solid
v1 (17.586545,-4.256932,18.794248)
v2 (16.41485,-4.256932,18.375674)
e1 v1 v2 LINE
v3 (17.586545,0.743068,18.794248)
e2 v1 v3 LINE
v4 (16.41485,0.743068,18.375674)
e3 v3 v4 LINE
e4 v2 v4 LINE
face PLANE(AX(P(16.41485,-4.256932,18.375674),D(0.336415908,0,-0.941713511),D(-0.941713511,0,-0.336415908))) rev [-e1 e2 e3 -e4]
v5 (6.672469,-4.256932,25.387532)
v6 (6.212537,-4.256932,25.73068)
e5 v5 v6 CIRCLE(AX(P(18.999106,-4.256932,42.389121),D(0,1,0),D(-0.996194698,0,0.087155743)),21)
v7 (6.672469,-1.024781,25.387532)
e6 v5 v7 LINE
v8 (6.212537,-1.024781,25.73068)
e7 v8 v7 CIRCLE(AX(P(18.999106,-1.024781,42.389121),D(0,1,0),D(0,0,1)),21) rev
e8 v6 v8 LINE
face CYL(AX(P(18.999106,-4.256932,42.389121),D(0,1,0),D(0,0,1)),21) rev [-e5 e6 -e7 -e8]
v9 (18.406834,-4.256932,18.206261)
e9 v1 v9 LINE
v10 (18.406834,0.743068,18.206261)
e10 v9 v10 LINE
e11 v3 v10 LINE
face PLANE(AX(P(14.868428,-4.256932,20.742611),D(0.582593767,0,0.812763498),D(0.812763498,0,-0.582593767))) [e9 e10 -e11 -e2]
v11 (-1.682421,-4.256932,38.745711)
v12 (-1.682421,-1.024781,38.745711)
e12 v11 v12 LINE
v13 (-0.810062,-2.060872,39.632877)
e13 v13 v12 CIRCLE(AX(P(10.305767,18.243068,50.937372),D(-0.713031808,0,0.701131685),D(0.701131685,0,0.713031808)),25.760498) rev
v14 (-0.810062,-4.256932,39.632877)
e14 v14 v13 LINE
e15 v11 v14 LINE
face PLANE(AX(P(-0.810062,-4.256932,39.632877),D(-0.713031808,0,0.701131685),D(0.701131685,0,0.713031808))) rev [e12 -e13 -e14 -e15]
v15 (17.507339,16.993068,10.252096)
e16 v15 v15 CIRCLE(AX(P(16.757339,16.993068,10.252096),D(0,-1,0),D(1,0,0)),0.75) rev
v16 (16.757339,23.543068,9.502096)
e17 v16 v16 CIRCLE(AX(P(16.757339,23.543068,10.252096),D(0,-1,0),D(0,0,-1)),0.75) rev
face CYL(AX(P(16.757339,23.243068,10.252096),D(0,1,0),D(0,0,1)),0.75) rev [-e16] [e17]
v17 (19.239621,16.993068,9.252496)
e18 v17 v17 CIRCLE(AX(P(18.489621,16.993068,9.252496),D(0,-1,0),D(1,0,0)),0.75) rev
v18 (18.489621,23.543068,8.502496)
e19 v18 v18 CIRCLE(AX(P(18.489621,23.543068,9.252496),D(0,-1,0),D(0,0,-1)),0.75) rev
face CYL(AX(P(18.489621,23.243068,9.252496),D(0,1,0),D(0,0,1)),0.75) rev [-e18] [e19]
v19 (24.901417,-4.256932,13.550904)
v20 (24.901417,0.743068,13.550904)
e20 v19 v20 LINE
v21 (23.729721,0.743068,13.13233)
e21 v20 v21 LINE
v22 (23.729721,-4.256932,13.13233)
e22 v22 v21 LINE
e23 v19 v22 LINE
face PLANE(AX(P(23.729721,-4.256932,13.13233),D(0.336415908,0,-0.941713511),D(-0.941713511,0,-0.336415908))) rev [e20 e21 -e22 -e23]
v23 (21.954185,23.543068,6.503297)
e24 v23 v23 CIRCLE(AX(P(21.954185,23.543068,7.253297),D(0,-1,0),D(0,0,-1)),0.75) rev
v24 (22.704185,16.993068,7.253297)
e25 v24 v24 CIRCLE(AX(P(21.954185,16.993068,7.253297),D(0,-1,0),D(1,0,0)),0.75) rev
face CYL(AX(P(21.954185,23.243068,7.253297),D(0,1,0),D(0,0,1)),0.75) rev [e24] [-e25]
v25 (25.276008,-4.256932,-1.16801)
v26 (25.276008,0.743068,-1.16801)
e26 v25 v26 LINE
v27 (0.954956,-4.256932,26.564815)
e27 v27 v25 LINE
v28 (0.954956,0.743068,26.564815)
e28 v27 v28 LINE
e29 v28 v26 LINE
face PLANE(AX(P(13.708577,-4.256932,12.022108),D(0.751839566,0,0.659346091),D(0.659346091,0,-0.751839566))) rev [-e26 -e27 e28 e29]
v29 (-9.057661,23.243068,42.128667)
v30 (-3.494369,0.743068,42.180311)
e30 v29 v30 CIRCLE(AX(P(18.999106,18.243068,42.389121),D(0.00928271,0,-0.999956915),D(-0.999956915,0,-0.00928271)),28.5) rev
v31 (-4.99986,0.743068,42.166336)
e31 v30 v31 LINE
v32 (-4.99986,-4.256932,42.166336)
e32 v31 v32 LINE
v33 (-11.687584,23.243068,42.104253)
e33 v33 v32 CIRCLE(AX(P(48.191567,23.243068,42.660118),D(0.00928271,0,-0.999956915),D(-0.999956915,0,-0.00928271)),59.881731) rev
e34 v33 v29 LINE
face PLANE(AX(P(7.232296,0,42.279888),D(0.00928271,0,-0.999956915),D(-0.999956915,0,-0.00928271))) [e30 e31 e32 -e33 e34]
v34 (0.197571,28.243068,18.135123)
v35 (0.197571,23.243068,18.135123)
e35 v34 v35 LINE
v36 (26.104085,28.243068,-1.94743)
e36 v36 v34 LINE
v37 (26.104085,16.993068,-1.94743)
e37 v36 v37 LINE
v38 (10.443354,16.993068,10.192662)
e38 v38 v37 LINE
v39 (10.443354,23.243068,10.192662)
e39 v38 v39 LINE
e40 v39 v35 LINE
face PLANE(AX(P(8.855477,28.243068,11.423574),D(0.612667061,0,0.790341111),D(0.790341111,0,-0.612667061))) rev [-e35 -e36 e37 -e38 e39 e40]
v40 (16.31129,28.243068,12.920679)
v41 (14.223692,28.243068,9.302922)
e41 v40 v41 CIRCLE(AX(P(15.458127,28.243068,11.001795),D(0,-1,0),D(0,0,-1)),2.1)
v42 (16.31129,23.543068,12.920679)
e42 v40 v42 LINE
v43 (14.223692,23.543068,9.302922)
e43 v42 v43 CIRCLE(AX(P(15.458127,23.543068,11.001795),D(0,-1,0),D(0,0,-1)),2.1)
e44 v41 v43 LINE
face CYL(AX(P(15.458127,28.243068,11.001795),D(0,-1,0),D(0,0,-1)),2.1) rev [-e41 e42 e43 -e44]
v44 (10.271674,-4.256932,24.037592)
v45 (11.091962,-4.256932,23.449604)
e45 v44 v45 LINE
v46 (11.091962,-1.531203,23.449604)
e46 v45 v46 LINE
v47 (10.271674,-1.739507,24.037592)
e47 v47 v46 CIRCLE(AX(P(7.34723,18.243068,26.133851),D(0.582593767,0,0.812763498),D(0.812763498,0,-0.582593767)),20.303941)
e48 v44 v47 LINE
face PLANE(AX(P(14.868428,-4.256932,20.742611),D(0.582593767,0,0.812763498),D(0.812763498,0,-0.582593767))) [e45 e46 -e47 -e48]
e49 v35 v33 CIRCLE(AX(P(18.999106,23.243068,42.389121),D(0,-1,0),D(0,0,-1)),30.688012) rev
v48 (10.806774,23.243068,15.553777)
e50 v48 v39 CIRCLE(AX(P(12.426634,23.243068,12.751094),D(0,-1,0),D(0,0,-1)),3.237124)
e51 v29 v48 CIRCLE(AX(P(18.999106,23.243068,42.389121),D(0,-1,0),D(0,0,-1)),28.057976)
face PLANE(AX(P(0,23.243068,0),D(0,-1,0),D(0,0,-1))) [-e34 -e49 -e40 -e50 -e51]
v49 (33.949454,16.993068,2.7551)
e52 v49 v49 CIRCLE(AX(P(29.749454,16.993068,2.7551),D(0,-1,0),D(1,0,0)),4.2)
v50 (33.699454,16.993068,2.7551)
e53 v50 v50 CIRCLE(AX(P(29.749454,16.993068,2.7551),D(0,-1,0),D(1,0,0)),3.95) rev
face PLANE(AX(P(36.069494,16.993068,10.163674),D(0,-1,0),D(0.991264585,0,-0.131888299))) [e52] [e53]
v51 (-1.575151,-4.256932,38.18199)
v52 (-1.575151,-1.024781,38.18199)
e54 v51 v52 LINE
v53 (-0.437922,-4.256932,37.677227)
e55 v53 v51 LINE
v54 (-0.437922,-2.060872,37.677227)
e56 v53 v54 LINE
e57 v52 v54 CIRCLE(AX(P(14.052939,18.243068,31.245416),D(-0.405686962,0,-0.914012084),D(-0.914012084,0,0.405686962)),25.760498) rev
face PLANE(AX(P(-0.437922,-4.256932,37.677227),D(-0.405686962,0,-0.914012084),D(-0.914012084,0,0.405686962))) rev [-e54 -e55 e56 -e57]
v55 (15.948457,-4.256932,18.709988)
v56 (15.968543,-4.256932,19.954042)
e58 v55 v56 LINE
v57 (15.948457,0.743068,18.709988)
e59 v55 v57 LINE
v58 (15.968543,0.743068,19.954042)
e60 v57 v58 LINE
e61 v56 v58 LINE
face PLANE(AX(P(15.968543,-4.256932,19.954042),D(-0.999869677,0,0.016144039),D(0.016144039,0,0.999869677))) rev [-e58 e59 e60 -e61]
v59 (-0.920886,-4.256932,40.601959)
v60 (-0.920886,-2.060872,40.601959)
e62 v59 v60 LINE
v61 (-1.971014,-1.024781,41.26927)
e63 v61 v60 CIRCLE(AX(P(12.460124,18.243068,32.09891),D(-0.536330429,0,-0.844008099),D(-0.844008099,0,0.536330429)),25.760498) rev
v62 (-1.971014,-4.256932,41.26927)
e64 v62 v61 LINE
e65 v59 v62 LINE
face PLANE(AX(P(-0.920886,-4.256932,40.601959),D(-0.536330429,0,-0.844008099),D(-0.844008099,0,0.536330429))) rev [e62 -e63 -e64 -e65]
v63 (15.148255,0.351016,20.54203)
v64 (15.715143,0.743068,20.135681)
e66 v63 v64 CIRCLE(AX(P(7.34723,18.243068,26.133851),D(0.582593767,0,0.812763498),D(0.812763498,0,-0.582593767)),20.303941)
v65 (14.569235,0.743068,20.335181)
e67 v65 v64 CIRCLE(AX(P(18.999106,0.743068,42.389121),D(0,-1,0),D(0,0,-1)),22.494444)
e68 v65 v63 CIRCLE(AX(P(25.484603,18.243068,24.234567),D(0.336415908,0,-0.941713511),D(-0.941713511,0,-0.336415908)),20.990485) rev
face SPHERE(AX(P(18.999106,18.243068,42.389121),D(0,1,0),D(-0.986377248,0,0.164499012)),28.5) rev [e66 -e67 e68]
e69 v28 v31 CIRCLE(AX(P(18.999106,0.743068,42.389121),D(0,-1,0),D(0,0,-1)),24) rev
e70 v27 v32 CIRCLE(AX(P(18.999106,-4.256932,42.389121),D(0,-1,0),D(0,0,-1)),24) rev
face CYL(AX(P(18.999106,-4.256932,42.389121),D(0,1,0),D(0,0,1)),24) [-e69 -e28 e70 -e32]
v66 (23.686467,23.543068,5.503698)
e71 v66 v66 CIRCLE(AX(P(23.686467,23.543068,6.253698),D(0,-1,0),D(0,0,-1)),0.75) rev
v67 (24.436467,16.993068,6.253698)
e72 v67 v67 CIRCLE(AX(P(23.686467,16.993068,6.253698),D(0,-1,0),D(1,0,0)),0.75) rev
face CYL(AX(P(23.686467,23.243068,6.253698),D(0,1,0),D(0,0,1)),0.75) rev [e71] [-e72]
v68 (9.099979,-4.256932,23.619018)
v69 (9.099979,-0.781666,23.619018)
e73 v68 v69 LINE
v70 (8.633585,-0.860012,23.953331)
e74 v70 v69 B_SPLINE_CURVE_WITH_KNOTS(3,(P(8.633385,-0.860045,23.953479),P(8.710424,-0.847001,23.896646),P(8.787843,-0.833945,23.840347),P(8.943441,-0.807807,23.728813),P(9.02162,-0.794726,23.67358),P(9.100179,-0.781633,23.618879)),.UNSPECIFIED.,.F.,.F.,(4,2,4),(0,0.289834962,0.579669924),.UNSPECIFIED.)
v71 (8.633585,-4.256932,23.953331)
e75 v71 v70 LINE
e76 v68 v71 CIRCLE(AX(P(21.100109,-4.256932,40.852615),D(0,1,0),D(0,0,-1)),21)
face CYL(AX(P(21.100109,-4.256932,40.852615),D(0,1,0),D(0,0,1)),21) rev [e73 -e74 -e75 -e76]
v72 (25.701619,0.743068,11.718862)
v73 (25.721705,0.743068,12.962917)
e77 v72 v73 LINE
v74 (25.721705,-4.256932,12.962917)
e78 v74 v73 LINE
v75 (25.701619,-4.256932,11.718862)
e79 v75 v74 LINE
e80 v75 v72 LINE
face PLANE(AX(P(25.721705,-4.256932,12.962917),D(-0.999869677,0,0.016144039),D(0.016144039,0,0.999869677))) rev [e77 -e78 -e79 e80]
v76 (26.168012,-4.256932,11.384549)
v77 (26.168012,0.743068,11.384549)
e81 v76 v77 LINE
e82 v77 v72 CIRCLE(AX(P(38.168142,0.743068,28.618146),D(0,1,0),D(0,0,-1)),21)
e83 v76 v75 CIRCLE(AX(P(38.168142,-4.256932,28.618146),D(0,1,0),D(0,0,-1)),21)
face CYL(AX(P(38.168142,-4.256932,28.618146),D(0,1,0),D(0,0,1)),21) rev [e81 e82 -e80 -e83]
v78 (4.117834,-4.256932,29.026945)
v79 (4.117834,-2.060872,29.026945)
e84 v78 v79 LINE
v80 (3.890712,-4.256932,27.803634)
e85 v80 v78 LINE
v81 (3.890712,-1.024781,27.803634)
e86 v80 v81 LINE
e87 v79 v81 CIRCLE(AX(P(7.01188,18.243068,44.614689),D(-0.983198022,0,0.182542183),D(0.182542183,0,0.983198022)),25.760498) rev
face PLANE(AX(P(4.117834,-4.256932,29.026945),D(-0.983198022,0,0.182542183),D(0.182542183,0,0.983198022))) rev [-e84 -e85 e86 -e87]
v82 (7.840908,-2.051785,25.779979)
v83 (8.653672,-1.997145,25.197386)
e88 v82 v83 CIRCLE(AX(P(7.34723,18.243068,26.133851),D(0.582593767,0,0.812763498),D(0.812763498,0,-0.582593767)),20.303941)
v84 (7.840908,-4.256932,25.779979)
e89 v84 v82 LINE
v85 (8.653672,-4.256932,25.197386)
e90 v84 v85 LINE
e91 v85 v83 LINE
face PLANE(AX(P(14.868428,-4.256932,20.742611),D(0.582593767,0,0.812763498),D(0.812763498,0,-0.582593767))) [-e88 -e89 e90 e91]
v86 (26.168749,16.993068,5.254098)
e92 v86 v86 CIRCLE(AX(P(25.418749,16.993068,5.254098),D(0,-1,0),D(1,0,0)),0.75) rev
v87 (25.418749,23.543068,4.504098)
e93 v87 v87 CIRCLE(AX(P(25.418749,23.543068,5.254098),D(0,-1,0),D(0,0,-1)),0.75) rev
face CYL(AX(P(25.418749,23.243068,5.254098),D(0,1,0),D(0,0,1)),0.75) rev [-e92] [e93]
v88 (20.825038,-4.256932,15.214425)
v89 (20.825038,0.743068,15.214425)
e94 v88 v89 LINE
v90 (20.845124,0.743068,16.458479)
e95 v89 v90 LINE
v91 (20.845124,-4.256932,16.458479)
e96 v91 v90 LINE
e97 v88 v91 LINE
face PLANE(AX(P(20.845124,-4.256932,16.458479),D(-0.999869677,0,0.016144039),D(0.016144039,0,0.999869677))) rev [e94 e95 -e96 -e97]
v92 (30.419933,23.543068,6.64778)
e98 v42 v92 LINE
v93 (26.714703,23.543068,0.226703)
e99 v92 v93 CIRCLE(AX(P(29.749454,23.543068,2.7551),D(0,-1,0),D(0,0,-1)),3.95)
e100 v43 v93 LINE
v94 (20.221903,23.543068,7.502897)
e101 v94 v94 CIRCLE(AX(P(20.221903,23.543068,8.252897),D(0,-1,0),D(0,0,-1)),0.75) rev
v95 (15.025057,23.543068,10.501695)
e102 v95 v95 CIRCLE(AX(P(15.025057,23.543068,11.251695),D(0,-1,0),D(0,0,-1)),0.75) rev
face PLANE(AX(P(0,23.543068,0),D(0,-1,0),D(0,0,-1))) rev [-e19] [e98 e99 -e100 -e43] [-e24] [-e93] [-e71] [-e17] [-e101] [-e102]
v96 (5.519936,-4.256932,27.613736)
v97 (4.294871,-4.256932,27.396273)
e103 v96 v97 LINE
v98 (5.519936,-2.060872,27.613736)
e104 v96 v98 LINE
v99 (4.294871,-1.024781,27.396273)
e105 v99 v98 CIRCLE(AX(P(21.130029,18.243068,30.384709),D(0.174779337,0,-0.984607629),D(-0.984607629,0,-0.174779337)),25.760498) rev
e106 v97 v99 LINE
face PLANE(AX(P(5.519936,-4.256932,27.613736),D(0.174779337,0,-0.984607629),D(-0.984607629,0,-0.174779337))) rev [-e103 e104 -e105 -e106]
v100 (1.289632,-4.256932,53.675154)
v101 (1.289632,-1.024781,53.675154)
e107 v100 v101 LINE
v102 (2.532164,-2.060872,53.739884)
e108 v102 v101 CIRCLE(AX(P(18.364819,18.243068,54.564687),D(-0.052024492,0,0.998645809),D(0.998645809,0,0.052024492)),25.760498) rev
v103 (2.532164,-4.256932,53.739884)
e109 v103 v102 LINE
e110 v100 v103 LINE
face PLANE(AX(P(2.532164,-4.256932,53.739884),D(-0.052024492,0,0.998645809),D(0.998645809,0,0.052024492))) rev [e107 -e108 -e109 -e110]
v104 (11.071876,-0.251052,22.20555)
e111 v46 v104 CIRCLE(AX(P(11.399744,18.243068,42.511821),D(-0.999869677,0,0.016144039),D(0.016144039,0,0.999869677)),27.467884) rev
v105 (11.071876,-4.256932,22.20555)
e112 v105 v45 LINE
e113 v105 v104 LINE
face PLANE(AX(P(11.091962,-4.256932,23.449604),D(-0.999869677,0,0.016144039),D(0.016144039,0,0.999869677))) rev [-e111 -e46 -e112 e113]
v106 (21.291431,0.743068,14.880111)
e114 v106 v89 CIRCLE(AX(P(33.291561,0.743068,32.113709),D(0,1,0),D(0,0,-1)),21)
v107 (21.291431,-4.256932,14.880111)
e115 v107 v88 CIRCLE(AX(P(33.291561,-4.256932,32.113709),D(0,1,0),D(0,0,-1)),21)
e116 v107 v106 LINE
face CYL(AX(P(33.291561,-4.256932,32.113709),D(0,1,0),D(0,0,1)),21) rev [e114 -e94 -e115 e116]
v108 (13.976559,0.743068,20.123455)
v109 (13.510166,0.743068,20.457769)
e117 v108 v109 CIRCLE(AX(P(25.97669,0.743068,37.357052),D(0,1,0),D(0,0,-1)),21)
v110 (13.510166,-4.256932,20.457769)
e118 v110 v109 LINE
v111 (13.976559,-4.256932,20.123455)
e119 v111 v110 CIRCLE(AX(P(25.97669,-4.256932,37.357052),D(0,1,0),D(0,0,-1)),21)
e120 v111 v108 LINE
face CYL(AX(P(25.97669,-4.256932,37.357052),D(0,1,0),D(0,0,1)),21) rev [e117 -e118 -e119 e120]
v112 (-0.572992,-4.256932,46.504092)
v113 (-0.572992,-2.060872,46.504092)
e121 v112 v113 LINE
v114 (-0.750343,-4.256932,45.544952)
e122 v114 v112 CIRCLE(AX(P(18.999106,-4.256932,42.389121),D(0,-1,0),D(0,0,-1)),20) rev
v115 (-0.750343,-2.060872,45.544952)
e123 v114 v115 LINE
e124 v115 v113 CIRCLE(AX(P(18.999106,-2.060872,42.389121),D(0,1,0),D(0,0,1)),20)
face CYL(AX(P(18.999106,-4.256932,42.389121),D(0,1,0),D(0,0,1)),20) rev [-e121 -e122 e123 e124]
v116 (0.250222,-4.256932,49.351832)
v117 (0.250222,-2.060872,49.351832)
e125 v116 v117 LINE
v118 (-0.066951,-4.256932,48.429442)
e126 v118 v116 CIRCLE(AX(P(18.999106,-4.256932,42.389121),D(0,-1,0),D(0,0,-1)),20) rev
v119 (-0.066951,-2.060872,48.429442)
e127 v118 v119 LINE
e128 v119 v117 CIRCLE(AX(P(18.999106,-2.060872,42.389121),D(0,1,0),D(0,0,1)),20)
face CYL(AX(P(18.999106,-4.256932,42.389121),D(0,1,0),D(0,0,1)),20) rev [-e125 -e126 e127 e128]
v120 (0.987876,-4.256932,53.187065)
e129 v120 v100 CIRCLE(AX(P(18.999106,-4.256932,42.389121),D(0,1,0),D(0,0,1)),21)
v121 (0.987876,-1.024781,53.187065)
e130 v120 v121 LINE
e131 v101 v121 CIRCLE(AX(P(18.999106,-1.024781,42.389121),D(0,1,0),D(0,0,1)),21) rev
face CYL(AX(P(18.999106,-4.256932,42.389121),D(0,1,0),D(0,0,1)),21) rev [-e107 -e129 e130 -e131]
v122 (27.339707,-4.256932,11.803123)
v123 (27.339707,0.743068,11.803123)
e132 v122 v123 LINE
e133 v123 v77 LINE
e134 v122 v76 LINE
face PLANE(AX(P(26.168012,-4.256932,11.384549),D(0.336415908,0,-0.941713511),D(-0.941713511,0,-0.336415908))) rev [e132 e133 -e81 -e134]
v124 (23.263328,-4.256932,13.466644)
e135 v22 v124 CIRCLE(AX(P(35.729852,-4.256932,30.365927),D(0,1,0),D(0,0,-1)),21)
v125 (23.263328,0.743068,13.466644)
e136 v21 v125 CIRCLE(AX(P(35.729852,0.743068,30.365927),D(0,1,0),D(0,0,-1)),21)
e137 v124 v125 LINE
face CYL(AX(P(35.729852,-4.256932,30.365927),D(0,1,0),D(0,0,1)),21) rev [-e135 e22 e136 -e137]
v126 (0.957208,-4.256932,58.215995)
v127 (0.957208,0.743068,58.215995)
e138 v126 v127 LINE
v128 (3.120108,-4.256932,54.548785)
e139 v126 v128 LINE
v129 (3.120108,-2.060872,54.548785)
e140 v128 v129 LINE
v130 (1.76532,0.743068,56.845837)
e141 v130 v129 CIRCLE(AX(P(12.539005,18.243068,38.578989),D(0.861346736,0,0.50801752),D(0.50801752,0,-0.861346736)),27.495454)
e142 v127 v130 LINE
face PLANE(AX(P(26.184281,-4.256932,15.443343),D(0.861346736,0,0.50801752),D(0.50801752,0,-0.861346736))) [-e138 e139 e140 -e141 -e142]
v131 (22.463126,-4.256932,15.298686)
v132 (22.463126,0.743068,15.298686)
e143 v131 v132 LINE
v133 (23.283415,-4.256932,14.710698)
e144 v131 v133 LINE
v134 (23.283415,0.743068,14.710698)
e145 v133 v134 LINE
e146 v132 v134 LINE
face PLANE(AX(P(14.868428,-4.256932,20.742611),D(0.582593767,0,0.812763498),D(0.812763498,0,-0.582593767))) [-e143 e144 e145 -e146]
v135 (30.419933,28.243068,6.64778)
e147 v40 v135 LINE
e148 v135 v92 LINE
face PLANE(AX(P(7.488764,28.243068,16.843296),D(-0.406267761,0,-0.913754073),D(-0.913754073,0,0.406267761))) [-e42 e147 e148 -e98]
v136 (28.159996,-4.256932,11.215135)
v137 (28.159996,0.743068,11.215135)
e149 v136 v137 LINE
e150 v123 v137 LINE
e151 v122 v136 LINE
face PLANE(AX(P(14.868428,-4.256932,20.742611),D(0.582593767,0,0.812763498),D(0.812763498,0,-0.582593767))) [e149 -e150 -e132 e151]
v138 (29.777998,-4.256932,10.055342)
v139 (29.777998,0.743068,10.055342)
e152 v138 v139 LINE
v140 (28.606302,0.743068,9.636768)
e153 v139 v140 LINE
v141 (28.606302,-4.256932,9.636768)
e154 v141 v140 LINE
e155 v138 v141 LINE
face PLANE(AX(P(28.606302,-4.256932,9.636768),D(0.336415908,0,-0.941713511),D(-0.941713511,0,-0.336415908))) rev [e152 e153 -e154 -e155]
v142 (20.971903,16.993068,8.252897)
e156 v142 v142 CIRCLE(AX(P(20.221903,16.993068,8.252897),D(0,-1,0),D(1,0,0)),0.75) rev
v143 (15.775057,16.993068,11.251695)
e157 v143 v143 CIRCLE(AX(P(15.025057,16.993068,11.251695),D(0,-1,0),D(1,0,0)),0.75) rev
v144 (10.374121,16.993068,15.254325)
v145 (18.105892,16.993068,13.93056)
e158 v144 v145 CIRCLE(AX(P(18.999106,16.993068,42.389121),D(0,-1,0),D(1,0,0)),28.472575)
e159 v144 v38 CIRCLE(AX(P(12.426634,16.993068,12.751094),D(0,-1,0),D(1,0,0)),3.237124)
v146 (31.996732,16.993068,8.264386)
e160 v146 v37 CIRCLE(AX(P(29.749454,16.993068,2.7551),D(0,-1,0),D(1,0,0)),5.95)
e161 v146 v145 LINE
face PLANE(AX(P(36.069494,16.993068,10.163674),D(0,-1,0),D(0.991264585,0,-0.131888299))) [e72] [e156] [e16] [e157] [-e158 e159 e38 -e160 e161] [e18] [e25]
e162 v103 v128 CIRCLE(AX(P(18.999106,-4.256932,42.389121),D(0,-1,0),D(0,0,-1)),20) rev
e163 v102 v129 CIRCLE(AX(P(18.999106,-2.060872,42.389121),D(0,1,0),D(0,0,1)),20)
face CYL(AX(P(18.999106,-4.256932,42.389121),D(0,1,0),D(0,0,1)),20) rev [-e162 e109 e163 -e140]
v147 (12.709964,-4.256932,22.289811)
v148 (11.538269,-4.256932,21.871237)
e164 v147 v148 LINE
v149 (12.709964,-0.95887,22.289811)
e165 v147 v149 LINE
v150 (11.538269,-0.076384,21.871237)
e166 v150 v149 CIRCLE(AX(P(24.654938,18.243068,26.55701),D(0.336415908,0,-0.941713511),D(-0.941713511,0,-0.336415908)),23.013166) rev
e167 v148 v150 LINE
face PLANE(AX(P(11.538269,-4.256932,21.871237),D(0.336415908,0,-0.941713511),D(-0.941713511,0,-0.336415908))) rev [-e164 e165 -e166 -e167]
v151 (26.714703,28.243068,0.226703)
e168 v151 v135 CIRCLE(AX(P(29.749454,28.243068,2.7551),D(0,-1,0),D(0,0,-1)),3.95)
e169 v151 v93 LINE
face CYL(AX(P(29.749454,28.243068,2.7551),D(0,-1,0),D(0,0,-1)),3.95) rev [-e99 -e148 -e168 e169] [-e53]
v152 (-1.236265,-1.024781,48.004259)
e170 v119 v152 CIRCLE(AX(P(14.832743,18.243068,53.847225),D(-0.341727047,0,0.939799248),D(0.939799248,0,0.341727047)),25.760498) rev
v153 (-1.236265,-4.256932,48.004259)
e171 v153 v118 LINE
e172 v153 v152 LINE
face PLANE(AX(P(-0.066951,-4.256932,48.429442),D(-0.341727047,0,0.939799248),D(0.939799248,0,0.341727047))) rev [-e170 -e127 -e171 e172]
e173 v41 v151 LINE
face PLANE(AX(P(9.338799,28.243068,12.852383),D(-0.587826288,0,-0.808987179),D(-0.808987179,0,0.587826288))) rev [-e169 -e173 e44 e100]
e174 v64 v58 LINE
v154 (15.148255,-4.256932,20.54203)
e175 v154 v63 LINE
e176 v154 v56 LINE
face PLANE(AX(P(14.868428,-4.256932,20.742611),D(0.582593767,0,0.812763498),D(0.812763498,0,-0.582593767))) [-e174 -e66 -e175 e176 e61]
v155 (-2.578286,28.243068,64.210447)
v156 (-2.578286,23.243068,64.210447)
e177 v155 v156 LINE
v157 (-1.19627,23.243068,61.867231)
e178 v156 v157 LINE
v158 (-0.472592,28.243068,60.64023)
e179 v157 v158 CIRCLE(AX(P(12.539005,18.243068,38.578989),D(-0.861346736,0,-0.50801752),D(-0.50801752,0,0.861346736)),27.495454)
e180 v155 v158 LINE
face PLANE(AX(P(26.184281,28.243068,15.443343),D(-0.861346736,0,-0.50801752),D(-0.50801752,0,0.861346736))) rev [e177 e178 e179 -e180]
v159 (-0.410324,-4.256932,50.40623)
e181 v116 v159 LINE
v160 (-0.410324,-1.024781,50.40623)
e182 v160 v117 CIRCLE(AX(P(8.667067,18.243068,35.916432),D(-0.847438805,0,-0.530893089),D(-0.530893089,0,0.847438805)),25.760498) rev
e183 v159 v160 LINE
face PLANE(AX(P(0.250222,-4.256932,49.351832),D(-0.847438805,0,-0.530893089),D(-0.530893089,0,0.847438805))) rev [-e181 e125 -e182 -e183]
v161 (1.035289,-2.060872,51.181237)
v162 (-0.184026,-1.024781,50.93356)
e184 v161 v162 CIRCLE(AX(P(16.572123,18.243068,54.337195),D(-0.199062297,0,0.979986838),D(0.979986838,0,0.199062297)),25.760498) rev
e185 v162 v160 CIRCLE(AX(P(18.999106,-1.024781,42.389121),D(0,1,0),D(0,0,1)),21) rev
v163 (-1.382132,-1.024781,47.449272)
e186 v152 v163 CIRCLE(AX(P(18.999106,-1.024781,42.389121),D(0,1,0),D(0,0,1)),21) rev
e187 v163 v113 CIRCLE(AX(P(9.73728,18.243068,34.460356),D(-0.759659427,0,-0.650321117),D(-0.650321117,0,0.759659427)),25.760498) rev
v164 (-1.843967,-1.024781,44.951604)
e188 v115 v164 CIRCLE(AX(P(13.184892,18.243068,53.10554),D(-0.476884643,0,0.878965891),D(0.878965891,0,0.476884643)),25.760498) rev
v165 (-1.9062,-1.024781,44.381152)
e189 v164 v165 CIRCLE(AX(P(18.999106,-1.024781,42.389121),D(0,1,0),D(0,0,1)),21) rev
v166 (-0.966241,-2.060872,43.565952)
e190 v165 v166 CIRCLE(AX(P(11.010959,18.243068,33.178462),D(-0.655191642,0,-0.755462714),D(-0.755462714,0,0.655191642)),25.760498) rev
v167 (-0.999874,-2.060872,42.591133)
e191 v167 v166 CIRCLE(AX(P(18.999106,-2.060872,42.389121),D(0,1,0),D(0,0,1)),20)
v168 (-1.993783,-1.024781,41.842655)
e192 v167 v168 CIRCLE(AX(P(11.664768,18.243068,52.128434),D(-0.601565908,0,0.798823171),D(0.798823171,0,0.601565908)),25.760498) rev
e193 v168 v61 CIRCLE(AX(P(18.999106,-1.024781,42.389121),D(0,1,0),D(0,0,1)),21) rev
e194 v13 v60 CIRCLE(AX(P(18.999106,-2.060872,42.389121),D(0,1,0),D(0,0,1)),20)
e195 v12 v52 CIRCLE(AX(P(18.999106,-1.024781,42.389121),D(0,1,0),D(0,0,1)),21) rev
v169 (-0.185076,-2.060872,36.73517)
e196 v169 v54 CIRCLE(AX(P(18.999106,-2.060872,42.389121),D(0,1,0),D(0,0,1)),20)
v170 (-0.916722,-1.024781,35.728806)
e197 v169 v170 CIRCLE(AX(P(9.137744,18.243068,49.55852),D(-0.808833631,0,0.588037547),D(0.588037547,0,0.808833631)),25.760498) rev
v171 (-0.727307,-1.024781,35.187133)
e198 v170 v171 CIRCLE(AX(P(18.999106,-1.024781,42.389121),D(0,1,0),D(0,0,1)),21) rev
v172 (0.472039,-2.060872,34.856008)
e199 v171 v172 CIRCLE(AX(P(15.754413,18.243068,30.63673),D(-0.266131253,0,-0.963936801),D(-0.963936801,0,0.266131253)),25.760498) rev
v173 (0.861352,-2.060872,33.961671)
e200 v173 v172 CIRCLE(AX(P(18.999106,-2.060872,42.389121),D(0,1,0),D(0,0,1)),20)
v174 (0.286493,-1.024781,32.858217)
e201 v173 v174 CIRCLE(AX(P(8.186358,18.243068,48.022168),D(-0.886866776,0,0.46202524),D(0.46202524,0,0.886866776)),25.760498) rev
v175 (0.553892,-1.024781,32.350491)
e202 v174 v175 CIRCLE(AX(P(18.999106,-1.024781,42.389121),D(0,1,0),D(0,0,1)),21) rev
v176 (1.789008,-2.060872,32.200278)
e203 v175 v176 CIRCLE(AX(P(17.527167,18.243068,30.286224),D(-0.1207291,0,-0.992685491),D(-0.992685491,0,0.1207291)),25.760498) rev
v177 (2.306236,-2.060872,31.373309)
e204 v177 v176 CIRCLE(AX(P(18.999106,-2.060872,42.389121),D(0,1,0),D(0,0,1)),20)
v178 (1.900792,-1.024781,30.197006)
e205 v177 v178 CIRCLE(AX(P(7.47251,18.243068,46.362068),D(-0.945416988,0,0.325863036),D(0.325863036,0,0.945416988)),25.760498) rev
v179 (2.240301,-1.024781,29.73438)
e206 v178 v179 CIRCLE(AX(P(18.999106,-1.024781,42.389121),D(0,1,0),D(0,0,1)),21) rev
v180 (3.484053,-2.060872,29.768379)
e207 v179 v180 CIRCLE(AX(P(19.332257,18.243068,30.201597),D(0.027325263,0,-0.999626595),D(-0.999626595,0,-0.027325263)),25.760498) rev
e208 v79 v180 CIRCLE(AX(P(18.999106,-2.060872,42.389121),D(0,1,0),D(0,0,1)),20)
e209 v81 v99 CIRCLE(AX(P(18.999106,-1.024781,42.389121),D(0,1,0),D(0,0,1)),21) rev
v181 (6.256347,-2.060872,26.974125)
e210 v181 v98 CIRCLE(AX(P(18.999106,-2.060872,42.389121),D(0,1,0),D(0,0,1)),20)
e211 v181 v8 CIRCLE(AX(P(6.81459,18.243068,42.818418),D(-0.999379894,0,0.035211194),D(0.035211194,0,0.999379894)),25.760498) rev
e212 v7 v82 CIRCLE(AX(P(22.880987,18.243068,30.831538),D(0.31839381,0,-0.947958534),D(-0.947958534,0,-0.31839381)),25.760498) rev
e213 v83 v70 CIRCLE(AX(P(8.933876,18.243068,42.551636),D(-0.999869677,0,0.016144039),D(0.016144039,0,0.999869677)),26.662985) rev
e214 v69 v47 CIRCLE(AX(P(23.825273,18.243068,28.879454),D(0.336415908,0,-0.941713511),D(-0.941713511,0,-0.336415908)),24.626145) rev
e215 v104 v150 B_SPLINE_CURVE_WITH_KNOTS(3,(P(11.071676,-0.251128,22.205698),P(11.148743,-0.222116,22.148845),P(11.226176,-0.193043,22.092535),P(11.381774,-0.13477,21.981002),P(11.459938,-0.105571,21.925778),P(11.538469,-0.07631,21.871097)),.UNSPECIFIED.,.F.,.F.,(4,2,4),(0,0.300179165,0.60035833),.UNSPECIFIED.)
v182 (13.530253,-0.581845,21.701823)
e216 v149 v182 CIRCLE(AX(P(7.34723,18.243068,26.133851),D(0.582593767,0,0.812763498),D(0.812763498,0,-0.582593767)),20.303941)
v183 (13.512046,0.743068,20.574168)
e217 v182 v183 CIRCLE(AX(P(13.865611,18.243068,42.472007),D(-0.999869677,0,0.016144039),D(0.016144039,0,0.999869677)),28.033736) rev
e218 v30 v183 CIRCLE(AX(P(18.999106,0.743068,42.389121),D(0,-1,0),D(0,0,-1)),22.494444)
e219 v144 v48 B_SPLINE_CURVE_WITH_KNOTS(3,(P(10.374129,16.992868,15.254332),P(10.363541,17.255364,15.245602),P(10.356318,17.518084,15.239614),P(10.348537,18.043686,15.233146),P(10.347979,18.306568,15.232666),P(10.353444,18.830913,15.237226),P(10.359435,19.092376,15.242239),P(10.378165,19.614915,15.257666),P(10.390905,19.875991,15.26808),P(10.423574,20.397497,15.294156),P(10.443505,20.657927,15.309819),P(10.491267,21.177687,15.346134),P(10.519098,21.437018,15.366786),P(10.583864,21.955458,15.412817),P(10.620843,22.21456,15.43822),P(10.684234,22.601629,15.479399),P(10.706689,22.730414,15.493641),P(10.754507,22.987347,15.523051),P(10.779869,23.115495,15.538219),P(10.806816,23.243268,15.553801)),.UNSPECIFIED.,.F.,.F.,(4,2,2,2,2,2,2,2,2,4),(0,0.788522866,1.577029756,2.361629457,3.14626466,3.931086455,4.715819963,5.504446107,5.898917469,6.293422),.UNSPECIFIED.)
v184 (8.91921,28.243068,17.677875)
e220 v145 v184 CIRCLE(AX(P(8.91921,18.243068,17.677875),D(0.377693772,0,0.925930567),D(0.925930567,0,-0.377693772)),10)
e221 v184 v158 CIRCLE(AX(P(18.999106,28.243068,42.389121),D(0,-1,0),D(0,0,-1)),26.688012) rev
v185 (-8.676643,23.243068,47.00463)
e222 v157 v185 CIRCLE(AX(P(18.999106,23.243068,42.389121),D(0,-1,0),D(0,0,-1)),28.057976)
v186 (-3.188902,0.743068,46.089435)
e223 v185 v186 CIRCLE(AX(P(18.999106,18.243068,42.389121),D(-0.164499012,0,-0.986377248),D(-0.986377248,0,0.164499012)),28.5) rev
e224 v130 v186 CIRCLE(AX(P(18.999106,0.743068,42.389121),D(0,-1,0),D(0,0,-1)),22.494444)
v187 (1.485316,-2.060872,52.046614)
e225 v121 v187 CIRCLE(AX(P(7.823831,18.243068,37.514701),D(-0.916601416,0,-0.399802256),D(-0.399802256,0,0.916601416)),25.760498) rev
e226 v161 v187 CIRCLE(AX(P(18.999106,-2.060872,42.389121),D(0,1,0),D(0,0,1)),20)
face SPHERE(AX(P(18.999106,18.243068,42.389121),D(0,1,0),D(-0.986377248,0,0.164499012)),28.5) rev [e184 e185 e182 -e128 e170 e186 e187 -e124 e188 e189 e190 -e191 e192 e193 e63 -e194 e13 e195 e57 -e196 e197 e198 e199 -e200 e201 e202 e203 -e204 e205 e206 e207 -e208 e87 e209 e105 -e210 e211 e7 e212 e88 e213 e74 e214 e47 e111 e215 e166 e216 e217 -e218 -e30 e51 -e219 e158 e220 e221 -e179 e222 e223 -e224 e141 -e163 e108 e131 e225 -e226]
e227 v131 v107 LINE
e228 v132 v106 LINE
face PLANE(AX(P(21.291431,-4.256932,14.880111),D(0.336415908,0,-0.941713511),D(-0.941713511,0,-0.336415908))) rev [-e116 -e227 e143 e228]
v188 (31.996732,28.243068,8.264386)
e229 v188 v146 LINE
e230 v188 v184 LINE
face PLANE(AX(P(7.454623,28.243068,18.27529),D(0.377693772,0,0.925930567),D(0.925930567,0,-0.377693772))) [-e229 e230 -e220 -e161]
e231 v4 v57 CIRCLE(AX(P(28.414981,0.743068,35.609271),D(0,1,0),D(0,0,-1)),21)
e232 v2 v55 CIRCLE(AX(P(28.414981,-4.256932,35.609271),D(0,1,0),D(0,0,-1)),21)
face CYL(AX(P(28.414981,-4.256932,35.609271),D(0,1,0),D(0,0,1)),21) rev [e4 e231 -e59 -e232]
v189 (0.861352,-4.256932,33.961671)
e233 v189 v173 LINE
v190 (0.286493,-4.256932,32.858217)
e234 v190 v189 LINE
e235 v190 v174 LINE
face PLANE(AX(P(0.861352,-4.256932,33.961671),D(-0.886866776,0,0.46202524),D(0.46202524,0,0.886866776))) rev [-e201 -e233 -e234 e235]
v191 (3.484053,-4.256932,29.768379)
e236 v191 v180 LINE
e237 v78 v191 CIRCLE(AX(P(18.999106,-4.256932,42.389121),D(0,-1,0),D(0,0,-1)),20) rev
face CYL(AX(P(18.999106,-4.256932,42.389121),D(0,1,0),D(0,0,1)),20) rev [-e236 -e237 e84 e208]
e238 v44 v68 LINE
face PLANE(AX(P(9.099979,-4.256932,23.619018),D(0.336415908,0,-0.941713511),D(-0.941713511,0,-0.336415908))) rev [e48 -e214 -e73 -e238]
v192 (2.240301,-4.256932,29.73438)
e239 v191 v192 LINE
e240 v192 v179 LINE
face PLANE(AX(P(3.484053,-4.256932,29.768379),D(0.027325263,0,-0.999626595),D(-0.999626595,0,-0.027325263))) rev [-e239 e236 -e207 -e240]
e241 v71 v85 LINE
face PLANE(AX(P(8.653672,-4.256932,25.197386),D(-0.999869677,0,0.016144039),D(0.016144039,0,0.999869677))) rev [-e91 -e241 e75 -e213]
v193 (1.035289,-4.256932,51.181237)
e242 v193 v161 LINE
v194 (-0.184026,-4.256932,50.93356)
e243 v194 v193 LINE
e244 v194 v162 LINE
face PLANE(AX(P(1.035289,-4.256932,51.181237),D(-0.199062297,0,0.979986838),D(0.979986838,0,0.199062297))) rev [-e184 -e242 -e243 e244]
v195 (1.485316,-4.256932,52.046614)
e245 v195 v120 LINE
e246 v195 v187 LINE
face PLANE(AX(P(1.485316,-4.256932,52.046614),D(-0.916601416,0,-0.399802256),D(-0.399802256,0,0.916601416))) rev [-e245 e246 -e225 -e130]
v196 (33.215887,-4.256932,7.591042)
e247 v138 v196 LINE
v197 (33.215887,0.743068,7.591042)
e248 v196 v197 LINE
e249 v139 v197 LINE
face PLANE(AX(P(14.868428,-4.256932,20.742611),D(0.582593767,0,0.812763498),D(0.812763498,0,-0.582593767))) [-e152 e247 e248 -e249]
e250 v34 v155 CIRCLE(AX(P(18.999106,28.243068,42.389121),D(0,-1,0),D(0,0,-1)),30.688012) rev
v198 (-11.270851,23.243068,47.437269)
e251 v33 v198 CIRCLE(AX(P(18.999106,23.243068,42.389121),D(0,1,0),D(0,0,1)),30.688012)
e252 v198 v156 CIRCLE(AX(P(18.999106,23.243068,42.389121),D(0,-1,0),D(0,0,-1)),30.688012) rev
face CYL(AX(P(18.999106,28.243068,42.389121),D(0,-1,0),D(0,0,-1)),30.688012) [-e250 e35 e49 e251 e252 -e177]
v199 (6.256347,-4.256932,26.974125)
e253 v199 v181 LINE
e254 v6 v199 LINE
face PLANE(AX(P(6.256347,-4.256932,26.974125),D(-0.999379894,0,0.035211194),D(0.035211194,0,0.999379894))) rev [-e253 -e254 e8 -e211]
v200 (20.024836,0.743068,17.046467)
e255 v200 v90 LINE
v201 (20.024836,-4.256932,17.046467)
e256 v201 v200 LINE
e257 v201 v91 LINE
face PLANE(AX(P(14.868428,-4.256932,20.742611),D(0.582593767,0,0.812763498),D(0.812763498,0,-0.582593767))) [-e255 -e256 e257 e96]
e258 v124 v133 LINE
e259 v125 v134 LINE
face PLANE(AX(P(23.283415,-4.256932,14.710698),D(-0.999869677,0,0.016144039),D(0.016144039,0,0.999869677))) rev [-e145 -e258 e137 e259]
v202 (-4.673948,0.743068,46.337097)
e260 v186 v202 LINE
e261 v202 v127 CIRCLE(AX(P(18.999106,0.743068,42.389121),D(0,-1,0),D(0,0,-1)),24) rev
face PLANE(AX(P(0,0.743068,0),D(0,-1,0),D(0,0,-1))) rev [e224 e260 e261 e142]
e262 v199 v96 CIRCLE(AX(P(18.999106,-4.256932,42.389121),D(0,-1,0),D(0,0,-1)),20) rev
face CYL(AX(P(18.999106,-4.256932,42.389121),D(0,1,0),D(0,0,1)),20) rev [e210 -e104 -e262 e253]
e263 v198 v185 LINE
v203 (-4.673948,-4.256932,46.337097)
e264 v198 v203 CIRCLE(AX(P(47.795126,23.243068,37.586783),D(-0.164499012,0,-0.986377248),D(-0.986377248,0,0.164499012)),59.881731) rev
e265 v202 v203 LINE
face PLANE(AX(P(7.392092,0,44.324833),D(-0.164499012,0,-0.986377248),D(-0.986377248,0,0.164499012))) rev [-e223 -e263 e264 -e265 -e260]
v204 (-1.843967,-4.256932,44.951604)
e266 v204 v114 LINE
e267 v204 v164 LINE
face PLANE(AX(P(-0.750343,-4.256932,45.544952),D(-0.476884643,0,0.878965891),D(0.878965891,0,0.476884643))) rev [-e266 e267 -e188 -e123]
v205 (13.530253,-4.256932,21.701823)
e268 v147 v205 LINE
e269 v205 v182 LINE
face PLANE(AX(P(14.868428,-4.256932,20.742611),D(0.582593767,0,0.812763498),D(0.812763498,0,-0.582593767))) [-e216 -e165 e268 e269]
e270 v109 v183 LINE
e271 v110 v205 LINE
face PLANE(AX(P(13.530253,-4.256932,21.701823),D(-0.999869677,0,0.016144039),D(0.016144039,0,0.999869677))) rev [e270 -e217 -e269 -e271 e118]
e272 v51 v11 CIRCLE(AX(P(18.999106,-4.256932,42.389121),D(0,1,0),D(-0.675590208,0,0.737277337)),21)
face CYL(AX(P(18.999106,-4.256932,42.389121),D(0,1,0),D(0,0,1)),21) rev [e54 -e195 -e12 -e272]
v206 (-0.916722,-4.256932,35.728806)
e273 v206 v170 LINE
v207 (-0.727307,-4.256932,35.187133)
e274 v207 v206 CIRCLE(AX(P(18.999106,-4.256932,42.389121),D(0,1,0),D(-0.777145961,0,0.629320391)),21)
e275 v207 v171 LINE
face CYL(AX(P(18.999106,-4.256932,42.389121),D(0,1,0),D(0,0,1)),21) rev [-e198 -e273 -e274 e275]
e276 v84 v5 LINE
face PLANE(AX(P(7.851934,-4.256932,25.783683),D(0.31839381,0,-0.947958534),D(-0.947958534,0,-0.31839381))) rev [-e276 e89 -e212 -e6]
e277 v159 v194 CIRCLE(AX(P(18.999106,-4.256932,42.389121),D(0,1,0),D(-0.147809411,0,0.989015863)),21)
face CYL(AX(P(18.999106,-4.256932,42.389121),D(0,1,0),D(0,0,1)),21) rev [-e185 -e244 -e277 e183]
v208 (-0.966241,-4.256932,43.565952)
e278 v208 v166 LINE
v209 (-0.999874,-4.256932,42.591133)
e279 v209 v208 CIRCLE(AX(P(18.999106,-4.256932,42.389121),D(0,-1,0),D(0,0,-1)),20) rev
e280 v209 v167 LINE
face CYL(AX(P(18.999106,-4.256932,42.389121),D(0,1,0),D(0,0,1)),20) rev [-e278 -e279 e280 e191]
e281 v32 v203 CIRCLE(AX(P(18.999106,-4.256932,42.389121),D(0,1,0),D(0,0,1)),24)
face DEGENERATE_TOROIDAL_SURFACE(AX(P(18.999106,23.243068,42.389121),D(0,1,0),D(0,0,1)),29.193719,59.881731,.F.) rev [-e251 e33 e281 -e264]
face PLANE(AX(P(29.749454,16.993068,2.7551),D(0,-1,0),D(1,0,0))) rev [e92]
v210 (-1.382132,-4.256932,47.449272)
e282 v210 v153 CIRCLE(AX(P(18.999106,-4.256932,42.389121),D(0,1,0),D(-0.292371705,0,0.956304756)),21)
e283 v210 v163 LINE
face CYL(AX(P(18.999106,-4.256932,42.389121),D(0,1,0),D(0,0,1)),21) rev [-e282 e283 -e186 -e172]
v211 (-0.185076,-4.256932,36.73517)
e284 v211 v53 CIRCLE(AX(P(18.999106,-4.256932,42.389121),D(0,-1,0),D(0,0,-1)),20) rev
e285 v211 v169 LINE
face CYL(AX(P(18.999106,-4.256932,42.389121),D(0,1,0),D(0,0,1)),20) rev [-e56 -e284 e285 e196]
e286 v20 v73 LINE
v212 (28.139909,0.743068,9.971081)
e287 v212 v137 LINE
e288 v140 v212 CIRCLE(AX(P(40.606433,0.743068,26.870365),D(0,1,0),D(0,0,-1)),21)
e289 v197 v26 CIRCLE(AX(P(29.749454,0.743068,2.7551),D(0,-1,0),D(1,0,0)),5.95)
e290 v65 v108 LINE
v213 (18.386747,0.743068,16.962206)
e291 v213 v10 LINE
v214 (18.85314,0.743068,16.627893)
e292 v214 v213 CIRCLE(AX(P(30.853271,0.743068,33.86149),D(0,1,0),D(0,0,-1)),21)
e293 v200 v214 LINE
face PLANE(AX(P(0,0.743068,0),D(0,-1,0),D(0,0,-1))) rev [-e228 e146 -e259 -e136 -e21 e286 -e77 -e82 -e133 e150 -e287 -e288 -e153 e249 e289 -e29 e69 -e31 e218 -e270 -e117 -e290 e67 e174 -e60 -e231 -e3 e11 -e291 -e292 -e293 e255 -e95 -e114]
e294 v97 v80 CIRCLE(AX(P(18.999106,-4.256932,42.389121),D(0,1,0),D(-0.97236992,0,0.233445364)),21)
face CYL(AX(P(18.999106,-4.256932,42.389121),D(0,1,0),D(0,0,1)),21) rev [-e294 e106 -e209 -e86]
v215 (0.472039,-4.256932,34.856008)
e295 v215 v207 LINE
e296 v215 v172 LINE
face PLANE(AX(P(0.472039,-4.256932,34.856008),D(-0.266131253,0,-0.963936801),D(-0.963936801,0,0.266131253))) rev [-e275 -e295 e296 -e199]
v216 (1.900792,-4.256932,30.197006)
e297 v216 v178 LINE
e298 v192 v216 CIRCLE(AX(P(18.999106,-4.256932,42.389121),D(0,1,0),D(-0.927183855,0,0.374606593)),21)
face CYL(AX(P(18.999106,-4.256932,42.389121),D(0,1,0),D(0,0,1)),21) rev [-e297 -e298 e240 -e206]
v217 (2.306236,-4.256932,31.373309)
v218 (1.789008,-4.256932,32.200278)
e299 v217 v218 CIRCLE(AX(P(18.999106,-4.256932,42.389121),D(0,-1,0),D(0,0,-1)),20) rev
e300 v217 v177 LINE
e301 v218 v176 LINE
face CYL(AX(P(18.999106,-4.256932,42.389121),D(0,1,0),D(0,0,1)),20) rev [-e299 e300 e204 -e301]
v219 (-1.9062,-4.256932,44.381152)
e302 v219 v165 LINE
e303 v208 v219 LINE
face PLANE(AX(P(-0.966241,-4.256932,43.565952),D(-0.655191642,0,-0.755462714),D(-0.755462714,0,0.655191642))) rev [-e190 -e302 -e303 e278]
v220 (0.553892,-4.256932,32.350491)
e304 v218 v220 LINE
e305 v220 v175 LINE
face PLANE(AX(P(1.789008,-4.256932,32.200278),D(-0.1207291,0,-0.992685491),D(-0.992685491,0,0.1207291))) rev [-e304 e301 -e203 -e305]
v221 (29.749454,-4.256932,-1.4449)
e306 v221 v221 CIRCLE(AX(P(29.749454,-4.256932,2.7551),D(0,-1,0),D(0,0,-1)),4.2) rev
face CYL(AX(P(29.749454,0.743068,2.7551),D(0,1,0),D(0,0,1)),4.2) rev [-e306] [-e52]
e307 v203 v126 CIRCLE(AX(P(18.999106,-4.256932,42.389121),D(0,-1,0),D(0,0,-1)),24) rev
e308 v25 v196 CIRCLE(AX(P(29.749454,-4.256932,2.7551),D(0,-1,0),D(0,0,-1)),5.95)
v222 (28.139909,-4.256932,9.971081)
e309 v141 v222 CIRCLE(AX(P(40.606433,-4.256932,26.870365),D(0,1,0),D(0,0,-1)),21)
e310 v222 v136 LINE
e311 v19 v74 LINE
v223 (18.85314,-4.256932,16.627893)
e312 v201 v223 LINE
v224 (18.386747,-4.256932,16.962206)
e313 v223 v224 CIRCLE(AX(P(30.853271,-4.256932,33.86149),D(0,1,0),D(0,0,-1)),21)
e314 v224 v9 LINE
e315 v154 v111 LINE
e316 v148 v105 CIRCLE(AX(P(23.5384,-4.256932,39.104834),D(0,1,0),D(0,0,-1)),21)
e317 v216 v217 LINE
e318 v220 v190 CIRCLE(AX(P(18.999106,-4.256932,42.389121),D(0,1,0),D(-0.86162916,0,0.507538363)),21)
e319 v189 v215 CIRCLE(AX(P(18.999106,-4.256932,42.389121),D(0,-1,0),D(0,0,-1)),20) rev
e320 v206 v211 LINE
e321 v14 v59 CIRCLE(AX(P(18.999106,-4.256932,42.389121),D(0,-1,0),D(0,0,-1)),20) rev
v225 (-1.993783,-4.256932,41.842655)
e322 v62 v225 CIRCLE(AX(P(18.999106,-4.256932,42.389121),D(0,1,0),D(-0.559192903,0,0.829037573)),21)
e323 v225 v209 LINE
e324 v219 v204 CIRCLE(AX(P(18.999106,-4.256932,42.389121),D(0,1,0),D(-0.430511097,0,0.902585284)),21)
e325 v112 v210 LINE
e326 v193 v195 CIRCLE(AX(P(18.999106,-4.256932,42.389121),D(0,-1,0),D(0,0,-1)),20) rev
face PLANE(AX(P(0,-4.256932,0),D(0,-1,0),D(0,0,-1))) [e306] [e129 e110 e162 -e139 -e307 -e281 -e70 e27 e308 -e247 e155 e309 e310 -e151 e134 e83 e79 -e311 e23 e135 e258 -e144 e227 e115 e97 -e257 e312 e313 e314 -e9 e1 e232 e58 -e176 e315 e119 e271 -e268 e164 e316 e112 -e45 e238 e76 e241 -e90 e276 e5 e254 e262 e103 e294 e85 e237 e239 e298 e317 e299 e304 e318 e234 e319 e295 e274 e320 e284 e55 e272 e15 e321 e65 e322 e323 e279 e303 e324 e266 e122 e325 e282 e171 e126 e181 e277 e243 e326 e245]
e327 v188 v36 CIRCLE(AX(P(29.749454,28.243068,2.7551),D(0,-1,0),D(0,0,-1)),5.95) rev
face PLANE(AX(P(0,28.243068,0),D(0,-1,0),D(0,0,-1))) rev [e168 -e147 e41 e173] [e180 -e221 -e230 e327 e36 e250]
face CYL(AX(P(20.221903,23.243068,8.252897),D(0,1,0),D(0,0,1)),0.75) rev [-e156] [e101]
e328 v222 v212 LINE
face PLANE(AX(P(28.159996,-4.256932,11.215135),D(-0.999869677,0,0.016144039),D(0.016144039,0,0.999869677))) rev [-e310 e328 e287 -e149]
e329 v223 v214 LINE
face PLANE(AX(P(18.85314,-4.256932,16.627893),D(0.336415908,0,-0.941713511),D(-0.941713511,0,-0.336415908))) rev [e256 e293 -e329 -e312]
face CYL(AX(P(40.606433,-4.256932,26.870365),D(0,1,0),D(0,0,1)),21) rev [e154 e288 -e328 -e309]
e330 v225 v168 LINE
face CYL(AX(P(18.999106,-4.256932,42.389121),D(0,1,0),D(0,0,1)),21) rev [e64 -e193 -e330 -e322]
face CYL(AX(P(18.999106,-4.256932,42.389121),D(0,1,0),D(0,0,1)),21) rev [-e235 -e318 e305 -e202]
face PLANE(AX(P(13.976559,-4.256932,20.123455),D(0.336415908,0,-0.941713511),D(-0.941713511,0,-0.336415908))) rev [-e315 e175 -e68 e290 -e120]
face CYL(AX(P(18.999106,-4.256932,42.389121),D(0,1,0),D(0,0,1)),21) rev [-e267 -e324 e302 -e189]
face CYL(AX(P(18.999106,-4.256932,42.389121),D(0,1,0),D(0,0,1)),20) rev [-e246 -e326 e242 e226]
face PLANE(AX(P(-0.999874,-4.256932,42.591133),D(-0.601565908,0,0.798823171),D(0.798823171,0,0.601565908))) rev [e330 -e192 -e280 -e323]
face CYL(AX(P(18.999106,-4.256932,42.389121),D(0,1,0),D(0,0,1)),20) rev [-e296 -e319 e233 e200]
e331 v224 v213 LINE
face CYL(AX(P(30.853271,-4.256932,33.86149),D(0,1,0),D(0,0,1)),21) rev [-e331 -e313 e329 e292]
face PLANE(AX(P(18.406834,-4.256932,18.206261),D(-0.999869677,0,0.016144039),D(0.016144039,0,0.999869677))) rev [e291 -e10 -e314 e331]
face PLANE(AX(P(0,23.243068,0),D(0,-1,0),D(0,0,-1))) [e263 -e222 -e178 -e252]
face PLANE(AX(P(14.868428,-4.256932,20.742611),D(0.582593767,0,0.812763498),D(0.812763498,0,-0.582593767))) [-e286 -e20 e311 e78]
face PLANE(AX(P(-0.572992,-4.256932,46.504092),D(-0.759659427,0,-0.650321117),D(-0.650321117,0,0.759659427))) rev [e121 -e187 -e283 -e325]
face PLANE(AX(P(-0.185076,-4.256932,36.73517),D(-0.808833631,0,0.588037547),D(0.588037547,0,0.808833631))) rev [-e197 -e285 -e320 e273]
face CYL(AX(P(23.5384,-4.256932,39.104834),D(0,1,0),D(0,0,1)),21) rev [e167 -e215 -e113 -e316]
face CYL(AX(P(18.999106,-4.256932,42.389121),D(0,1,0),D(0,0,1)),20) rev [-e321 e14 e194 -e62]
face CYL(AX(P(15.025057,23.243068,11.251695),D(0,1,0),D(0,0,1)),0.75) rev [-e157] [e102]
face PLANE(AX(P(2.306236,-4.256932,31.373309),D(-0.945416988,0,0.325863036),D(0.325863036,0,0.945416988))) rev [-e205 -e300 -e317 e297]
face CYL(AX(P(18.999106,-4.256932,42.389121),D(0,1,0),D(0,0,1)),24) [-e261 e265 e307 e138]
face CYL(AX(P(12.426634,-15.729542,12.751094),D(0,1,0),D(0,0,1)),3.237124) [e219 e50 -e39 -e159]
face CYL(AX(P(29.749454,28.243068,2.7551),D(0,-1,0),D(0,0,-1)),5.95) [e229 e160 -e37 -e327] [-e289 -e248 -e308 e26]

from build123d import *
from build123d.topology import SkipClean

# Parameters (mm, degrees)
BOSS_EXTRUDE1_START       = -4.7
BOSS_EXTRUDE1_DEPTH       = 4.7
BOSS_EXTRUDE2_OUTLINE_R   = 0.75
BOSS_EXTRUDE2_OUTLINE_R_2 = 2.5
BOSS_EXTRUDE2_DEPTH       = 0.3
SKETCH1_9_R               = 3.95
CUT_EXTRUDE2_DEPTH        = 0.7
SKETCH6_R                 = 0.75
SKETCH6_R_2               = 3.95
BOSS_EXTRUDE6_DEPTH       = 6.25
BOSS_EXTRUDE3_START       = 6.25
SKETCH2_R                 = 5.95
SKETCH2_R_2               = 4.2
BOSS_EXTRUDE3_DEPTH       = 16.25
SKETCH4_R                 = 5.95
SKETCH4_R_2               = 4.2
BOSS_EXTRUDE5_DEPTH       = 5
REVOLVE1_ANGLE            = 10
CUT_EXTRUDE3_DEPTH        = 79.445410831
CIRPATTERN1_COUNT         = 11
CIRPATTERN1_ANGLE         = 85
CUT_EXTRUDE4_DEPTH        = 79.445410831
LPATTERN1_COUNT           = 9
LPATTERN1_PITCH           = 3


# Read off the part's stored shape, not the designer's step: Boss-Extrude2
with BuildPart() as part:
    # Sketch1 → Boss-Extrude1 (new body)
    with BuildSketch(Plane.XZ.offset(-23.543068193).offset(BOSS_EXTRUDE1_START)):
        with BuildLine():
            Line((-0.472592015, 60.640230135), (-2.578285997, 64.210446846))
            ThreePointArc((-2.578285997, 64.210446846), (-11.633365316, 40.543634759), (0.19757138, 18.135123145))
            Line((0.19757138, 18.135123145), (26.104084692, -1.947430003))
            ThreePointArc((26.104084692, -1.947430003), (34.902992649, -0.218708783), (31.996731648, 8.264386483))
            Line((31.996731648, 8.264386483), (8.919209653, 17.677874535))
            ThreePointArc((8.919209653, 17.677874535), (-7.073200942, 36.689574632), (-0.472592015, 60.640230135))
        make_face()
        with BuildLine():
            ThreePointArc((14.223692018, 9.302922077), (13.639231125, 12.051374585), (16.311289521, 12.920678706))
            Line((16.311289521, 12.920678706), (30.419933466, 6.647779521))
            ThreePointArc((30.419933466, 6.647779521), (32.770289273, 5.300105007), (33.699453705, 2.75509961))
            ThreePointArc((33.699453705, 2.75509961), (31.093930231, -0.959046708), (26.714702885, 0.226703387))
            Line((26.714702885, 0.226703387), (14.223692018, 9.302922077))
        make_face(mode=Mode.SUBTRACT)
    extrude(amount=BOSS_EXTRUDE1_DEPTH)

    # Boss-Extrude2 outline → Boss-Extrude2 (add)
    with BuildSketch(Plane.XZ.offset(-23.543068193)):
        with BuildLine():
            Line((-0.472592015, 60.640230135), (-2.578285997, 64.210446846))
            ThreePointArc((-2.578285997, 64.210446846), (-11.633365316, 40.543634759), (0.19757138, 18.135123145))
            Line((0.19757138, 18.135123145), (26.104084692, -1.947430003))
            ThreePointArc((26.104084692, -1.947430003), (34.902992649, -0.218708783), (31.996731648, 8.264386483))
            Line((31.996731648, 8.264386483), (8.919209653, 17.677874535))
            ThreePointArc((8.919209653, 17.677874535), (-7.073200942, 36.689574632), (-0.472592015, 60.640230135))
        make_face()
        with Locations((15.025056724, 11.251695017)):
            Circle(BOSS_EXTRUDE2_OUTLINE_R, mode=Mode.SUBTRACT)
        with Locations((16.757338721, 10.252095558)):
            Circle(BOSS_EXTRUDE2_OUTLINE_R, mode=Mode.SUBTRACT)
        with Locations((18.489620719, 9.252496098)):
            Circle(BOSS_EXTRUDE2_OUTLINE_R, mode=Mode.SUBTRACT)
        with Locations((20.221902717, 8.252896638)):
            Circle(BOSS_EXTRUDE2_OUTLINE_R, mode=Mode.SUBTRACT)
        with Locations((21.954184715, 7.253297178)):
            Circle(BOSS_EXTRUDE2_OUTLINE_R, mode=Mode.SUBTRACT)
        with Locations((23.686466713, 6.253697719)):
            Circle(BOSS_EXTRUDE2_OUTLINE_R, mode=Mode.SUBTRACT)
        with Locations((29.749453705, 2.75509961)):
            Circle(BOSS_EXTRUDE2_OUTLINE_R_2, mode=Mode.SUBTRACT)
        with Locations((25.418748711, 5.254098259)):
            Circle(BOSS_EXTRUDE2_OUTLINE_R, mode=Mode.SUBTRACT)
    extrude(amount=BOSS_EXTRUDE2_DEPTH)

    # Sketch1<9> → Cut-Extrude2 (cut)
    with SkipClean():  # the faces are left unmerged after this step: merging them gives an invalid solid
        with BuildSketch(Plane.XZ.offset(-23.543068193)):
            with Locations(Location((29.749453705, 2.75509961, 0), (0, 0, 270))):
                Circle(SKETCH1_9_R)
        extrude(amount=CUT_EXTRUDE2_DEPTH, mode=Mode.SUBTRACT)

    # Sketch6 → Boss-Extrude6 (add)
    with SkipClean():  # the faces are left unmerged after this step: merging them gives an invalid solid
        with BuildSketch(Plane.XZ.offset(-23.243068193)):
            with BuildLine():
                Line((31.996731648, 8.264386483), (13.649275404, 15.748446521))
                ThreePointArc((13.649275404, 15.748446521), (9.622827675, 14.369008044), (10.443354312, 10.192661811))
                Line((10.443354312, 10.192661811), (26.104084692, -1.947430003))
                ThreePointArc((26.104084692, -1.947430003), (34.902992649, -0.218708783), (31.996731648, 8.264386483))
            make_face()
            with Locations((15.025056724, 11.251695017)):
                Circle(SKETCH6_R, mode=Mode.SUBTRACT)
            with Locations((16.757338721, 10.252095558)):
                Circle(SKETCH6_R, mode=Mode.SUBTRACT)
            with Locations((18.489620719, 9.252496098)):
                Circle(SKETCH6_R, mode=Mode.SUBTRACT)
            with Locations((20.221902717, 8.252896638)):
                Circle(SKETCH6_R, mode=Mode.SUBTRACT)
            with Locations((21.954184715, 7.253297178)):
                Circle(SKETCH6_R, mode=Mode.SUBTRACT)
            with Locations((23.686466713, 6.253697719)):
                Circle(SKETCH6_R, mode=Mode.SUBTRACT)
            with Locations((29.749453705, 2.75509961)):
                Circle(SKETCH6_R_2, mode=Mode.SUBTRACT)
            with Locations((25.418748711, 5.254098259)):
                Circle(SKETCH6_R, mode=Mode.SUBTRACT)
        extrude(amount=BOSS_EXTRUDE6_DEPTH)

    # Sketch2 → Boss-Extrude3 (add)
    with SkipClean():  # the faces are left unmerged after this step: merging them gives an invalid solid
        with BuildSketch(Plane.XZ.offset(-23.243068193).offset(BOSS_EXTRUDE3_START)):
            with Locations(Location((29.749453705, 2.75509961, 0), (0, 0, 232.217400312))):
                Circle(SKETCH2_R)
            with Locations((29.749453705, 2.75509961)):
                Circle(SKETCH2_R_2, mode=Mode.SUBTRACT)
        extrude(amount=BOSS_EXTRUDE3_DEPTH)

    # Sketch4 → Boss-Extrude5 (add)
    # profile 1 of 2: a face of its own
    with SkipClean():  # the faces are left unmerged after this step: merging them gives an invalid solid
        with BuildSketch(Plane.XZ.offset(-0.743068193)):
            with Locations(Location((29.749453705, 2.75509961, 0), (0, 0, 232.217400312))):
                Circle(SKETCH4_R)
            with Locations((29.749453705, 2.75509961)):
                Circle(SKETCH4_R_2, mode=Mode.SUBTRACT)
        # profile 2 of 2: a face of its own
        with BuildSketch(Plane.XZ.offset(-0.743068193)):
            with BuildLine():
                Line((33.215886618, 7.59104242), (7.347230343, 26.133850933))
                ThreePointArc((7.347230343, 26.133850933), (-0.783193574, 39.446224983), (3.120108256, 54.548785387))
                Line((3.120108256, 54.548785387), (0.957208419, 58.215994967))
                ThreePointArc((0.957208419, 58.215994967), (-5.00089426, 42.390828737), (0.954956103, 26.564814703))
                Line((0.954956103, 26.564814703), (25.27600829, -1.168009631))
                ThreePointArc((25.27600829, -1.168009631), (25.34107909, 6.751189354), (33.215886618, 7.59104242))
            make_face()
        extrude(amount=BOSS_EXTRUDE5_DEPTH)

    # Sketch5 → Cut-Revolve1 (revolve, cut)
    with SkipClean():  # the faces are left unmerged after this step: merging them gives an invalid solid
        with BuildSketch(Plane(origin=(7.392091837, 0, 44.324832913), x_dir=(-0.9863772479069666, 0, 0.1644990115820723), z_dir=(-0.1644990115820723, 1.1589156336199524e-15, -0.9863772479069666))):
            with BuildLine():
                ThreePointArc((16.732682915, 18.243068193), (8.385226178, 38.395611457), (-11.767317085, 46.743068193))
                Line((-11.767317085, 46.743068193), (-11.767317085, -10.256931807))
                ThreePointArc((-11.767317085, -10.256931807), (8.385226178, -1.909475071), (16.732682915, 18.243068193))
            make_face()
            with BuildLine():
                Line((-11.767317085, -10.256931807), (-11.767317085, 46.743068193))
                ThreePointArc((-11.767317085, 46.743068193), (-40.267317085, 18.243068193), (-11.767317085, -10.256931807))
            make_face()
        revolve(axis=Axis((18.999105679, 46.743068193, 42.389120883), (0, -1, 0)), mode=Mode.SUBTRACT)

    # Sketch9 → Revolve1 (revolve)
    with SkipClean():  # the faces are left unmerged after this step: merging them gives an invalid solid
        with BuildSketch(Plane(origin=(71.492081558, 0, 33.634820573), x_dir=(0.9863772479069666, 0, -0.1644990115820723), z_dir=(0.1644990115820723, -1.1589156336199524e-15, 0.9863772479069666))):
            with BuildLine():
                Line((-81.275926524, 23.243068193), (-83.905963121, 23.243068193))
                ThreePointArc((-83.905963121, 23.243068193), (-82.209941974, 9.092277505), (-77.21795083, -4.256931807))
                Line((-77.21795083, -4.256931807), (-77.21795083, 0.743068193))
                Line((-77.21795083, 0.743068193), (-75.712394589, 0.743068193))
                ThreePointArc((-75.712394589, 0.743068193), (-80.884704852, 11.401962881), (-81.275926524, 23.243068193))
            make_face()
        revolve(axis=Axis((18.999105679, 28.243068193, 42.389120883), (0, -1, 0)), revolution_arc=REVOLVE1_ANGLE)

    # Sketch11 → Cut-Extrude3 (cut, through all)
    with SkipClean():  # the faces are left unmerged after this step: merging them gives an invalid solid
        with BuildSketch(Plane(origin=(0, 0.743068193, 0), x_dir=(1, 0, 0), z_dir=(0, 1, 0))):
            with BuildLine():
                Line((2.532163802, -53.739884083), (1.289632269, -53.675154355))
                ThreePointArc((1.289632269, -53.675154355), (1.137086791, -53.432140455), (0.987875796, -53.187065043))
                Line((0.987875796, -53.187065043), (1.485316335, -52.046614493))
                ThreePointArc((1.485316335, -52.046614493), (1.987659119, -52.90628238), (2.532163802, -53.739884083))
            make_face()
        cut_extrude3 = extrude(amount=-CUT_EXTRUDE3_DEPTH, mode=Mode.SUBTRACT)

    # CirPattern1: Cut-Extrude3 ×11 about axis
    with SkipClean():  # the faces are left unmerged after this step: merging them gives an invalid solid
        cirpattern1_axis = Axis((18.999105679, 0, 42.389120883), (0, -1, 0))
        for i in range(1, CIRPATTERN1_COUNT):
            add(cut_extrude3.rotate(cirpattern1_axis, i * CIRPATTERN1_ANGLE / (CIRPATTERN1_COUNT - 1)), mode=Mode.SUBTRACT)

    # Sketch13 → Cut-Extrude4 (cut, through all)
    with SkipClean():  # the faces are left unmerged after this step: merging them gives an invalid solid
        with BuildSketch(Plane(origin=(0, 0.743068193, 0), x_dir=(1, 0, 0), z_dir=(0, 1, 0))):
            with BuildLine():
                Line((8.653671949, -25.197385727), (8.63358527, -23.953331438))
                ThreePointArc((8.63358527, -23.953331438), (8.865639921, -23.78458157), (9.099978501, -23.619017963))
                Line((9.099978501, -23.619017963), (10.271673933, -24.037592166))
                Line((10.271673933, -24.037592166), (8.653671949, -25.197385727))
            make_face()
        cut_extrude4 = extrude(amount=-CUT_EXTRUDE4_DEPTH, mode=Mode.SUBTRACT)

    # LPattern1: Cut-Extrude4 ×9
    with SkipClean():  # the faces are left unmerged after this step: merging them gives an invalid solid
        with Locations(*[Vector(0.8127634975154758, 0, -0.5825937667933044) * (i * LPATTERN1_PITCH) for i in range(1, LPATTERN1_COUNT)]):
            add(cut_extrude4, mode=Mode.SUBTRACT)


solid = part.part
